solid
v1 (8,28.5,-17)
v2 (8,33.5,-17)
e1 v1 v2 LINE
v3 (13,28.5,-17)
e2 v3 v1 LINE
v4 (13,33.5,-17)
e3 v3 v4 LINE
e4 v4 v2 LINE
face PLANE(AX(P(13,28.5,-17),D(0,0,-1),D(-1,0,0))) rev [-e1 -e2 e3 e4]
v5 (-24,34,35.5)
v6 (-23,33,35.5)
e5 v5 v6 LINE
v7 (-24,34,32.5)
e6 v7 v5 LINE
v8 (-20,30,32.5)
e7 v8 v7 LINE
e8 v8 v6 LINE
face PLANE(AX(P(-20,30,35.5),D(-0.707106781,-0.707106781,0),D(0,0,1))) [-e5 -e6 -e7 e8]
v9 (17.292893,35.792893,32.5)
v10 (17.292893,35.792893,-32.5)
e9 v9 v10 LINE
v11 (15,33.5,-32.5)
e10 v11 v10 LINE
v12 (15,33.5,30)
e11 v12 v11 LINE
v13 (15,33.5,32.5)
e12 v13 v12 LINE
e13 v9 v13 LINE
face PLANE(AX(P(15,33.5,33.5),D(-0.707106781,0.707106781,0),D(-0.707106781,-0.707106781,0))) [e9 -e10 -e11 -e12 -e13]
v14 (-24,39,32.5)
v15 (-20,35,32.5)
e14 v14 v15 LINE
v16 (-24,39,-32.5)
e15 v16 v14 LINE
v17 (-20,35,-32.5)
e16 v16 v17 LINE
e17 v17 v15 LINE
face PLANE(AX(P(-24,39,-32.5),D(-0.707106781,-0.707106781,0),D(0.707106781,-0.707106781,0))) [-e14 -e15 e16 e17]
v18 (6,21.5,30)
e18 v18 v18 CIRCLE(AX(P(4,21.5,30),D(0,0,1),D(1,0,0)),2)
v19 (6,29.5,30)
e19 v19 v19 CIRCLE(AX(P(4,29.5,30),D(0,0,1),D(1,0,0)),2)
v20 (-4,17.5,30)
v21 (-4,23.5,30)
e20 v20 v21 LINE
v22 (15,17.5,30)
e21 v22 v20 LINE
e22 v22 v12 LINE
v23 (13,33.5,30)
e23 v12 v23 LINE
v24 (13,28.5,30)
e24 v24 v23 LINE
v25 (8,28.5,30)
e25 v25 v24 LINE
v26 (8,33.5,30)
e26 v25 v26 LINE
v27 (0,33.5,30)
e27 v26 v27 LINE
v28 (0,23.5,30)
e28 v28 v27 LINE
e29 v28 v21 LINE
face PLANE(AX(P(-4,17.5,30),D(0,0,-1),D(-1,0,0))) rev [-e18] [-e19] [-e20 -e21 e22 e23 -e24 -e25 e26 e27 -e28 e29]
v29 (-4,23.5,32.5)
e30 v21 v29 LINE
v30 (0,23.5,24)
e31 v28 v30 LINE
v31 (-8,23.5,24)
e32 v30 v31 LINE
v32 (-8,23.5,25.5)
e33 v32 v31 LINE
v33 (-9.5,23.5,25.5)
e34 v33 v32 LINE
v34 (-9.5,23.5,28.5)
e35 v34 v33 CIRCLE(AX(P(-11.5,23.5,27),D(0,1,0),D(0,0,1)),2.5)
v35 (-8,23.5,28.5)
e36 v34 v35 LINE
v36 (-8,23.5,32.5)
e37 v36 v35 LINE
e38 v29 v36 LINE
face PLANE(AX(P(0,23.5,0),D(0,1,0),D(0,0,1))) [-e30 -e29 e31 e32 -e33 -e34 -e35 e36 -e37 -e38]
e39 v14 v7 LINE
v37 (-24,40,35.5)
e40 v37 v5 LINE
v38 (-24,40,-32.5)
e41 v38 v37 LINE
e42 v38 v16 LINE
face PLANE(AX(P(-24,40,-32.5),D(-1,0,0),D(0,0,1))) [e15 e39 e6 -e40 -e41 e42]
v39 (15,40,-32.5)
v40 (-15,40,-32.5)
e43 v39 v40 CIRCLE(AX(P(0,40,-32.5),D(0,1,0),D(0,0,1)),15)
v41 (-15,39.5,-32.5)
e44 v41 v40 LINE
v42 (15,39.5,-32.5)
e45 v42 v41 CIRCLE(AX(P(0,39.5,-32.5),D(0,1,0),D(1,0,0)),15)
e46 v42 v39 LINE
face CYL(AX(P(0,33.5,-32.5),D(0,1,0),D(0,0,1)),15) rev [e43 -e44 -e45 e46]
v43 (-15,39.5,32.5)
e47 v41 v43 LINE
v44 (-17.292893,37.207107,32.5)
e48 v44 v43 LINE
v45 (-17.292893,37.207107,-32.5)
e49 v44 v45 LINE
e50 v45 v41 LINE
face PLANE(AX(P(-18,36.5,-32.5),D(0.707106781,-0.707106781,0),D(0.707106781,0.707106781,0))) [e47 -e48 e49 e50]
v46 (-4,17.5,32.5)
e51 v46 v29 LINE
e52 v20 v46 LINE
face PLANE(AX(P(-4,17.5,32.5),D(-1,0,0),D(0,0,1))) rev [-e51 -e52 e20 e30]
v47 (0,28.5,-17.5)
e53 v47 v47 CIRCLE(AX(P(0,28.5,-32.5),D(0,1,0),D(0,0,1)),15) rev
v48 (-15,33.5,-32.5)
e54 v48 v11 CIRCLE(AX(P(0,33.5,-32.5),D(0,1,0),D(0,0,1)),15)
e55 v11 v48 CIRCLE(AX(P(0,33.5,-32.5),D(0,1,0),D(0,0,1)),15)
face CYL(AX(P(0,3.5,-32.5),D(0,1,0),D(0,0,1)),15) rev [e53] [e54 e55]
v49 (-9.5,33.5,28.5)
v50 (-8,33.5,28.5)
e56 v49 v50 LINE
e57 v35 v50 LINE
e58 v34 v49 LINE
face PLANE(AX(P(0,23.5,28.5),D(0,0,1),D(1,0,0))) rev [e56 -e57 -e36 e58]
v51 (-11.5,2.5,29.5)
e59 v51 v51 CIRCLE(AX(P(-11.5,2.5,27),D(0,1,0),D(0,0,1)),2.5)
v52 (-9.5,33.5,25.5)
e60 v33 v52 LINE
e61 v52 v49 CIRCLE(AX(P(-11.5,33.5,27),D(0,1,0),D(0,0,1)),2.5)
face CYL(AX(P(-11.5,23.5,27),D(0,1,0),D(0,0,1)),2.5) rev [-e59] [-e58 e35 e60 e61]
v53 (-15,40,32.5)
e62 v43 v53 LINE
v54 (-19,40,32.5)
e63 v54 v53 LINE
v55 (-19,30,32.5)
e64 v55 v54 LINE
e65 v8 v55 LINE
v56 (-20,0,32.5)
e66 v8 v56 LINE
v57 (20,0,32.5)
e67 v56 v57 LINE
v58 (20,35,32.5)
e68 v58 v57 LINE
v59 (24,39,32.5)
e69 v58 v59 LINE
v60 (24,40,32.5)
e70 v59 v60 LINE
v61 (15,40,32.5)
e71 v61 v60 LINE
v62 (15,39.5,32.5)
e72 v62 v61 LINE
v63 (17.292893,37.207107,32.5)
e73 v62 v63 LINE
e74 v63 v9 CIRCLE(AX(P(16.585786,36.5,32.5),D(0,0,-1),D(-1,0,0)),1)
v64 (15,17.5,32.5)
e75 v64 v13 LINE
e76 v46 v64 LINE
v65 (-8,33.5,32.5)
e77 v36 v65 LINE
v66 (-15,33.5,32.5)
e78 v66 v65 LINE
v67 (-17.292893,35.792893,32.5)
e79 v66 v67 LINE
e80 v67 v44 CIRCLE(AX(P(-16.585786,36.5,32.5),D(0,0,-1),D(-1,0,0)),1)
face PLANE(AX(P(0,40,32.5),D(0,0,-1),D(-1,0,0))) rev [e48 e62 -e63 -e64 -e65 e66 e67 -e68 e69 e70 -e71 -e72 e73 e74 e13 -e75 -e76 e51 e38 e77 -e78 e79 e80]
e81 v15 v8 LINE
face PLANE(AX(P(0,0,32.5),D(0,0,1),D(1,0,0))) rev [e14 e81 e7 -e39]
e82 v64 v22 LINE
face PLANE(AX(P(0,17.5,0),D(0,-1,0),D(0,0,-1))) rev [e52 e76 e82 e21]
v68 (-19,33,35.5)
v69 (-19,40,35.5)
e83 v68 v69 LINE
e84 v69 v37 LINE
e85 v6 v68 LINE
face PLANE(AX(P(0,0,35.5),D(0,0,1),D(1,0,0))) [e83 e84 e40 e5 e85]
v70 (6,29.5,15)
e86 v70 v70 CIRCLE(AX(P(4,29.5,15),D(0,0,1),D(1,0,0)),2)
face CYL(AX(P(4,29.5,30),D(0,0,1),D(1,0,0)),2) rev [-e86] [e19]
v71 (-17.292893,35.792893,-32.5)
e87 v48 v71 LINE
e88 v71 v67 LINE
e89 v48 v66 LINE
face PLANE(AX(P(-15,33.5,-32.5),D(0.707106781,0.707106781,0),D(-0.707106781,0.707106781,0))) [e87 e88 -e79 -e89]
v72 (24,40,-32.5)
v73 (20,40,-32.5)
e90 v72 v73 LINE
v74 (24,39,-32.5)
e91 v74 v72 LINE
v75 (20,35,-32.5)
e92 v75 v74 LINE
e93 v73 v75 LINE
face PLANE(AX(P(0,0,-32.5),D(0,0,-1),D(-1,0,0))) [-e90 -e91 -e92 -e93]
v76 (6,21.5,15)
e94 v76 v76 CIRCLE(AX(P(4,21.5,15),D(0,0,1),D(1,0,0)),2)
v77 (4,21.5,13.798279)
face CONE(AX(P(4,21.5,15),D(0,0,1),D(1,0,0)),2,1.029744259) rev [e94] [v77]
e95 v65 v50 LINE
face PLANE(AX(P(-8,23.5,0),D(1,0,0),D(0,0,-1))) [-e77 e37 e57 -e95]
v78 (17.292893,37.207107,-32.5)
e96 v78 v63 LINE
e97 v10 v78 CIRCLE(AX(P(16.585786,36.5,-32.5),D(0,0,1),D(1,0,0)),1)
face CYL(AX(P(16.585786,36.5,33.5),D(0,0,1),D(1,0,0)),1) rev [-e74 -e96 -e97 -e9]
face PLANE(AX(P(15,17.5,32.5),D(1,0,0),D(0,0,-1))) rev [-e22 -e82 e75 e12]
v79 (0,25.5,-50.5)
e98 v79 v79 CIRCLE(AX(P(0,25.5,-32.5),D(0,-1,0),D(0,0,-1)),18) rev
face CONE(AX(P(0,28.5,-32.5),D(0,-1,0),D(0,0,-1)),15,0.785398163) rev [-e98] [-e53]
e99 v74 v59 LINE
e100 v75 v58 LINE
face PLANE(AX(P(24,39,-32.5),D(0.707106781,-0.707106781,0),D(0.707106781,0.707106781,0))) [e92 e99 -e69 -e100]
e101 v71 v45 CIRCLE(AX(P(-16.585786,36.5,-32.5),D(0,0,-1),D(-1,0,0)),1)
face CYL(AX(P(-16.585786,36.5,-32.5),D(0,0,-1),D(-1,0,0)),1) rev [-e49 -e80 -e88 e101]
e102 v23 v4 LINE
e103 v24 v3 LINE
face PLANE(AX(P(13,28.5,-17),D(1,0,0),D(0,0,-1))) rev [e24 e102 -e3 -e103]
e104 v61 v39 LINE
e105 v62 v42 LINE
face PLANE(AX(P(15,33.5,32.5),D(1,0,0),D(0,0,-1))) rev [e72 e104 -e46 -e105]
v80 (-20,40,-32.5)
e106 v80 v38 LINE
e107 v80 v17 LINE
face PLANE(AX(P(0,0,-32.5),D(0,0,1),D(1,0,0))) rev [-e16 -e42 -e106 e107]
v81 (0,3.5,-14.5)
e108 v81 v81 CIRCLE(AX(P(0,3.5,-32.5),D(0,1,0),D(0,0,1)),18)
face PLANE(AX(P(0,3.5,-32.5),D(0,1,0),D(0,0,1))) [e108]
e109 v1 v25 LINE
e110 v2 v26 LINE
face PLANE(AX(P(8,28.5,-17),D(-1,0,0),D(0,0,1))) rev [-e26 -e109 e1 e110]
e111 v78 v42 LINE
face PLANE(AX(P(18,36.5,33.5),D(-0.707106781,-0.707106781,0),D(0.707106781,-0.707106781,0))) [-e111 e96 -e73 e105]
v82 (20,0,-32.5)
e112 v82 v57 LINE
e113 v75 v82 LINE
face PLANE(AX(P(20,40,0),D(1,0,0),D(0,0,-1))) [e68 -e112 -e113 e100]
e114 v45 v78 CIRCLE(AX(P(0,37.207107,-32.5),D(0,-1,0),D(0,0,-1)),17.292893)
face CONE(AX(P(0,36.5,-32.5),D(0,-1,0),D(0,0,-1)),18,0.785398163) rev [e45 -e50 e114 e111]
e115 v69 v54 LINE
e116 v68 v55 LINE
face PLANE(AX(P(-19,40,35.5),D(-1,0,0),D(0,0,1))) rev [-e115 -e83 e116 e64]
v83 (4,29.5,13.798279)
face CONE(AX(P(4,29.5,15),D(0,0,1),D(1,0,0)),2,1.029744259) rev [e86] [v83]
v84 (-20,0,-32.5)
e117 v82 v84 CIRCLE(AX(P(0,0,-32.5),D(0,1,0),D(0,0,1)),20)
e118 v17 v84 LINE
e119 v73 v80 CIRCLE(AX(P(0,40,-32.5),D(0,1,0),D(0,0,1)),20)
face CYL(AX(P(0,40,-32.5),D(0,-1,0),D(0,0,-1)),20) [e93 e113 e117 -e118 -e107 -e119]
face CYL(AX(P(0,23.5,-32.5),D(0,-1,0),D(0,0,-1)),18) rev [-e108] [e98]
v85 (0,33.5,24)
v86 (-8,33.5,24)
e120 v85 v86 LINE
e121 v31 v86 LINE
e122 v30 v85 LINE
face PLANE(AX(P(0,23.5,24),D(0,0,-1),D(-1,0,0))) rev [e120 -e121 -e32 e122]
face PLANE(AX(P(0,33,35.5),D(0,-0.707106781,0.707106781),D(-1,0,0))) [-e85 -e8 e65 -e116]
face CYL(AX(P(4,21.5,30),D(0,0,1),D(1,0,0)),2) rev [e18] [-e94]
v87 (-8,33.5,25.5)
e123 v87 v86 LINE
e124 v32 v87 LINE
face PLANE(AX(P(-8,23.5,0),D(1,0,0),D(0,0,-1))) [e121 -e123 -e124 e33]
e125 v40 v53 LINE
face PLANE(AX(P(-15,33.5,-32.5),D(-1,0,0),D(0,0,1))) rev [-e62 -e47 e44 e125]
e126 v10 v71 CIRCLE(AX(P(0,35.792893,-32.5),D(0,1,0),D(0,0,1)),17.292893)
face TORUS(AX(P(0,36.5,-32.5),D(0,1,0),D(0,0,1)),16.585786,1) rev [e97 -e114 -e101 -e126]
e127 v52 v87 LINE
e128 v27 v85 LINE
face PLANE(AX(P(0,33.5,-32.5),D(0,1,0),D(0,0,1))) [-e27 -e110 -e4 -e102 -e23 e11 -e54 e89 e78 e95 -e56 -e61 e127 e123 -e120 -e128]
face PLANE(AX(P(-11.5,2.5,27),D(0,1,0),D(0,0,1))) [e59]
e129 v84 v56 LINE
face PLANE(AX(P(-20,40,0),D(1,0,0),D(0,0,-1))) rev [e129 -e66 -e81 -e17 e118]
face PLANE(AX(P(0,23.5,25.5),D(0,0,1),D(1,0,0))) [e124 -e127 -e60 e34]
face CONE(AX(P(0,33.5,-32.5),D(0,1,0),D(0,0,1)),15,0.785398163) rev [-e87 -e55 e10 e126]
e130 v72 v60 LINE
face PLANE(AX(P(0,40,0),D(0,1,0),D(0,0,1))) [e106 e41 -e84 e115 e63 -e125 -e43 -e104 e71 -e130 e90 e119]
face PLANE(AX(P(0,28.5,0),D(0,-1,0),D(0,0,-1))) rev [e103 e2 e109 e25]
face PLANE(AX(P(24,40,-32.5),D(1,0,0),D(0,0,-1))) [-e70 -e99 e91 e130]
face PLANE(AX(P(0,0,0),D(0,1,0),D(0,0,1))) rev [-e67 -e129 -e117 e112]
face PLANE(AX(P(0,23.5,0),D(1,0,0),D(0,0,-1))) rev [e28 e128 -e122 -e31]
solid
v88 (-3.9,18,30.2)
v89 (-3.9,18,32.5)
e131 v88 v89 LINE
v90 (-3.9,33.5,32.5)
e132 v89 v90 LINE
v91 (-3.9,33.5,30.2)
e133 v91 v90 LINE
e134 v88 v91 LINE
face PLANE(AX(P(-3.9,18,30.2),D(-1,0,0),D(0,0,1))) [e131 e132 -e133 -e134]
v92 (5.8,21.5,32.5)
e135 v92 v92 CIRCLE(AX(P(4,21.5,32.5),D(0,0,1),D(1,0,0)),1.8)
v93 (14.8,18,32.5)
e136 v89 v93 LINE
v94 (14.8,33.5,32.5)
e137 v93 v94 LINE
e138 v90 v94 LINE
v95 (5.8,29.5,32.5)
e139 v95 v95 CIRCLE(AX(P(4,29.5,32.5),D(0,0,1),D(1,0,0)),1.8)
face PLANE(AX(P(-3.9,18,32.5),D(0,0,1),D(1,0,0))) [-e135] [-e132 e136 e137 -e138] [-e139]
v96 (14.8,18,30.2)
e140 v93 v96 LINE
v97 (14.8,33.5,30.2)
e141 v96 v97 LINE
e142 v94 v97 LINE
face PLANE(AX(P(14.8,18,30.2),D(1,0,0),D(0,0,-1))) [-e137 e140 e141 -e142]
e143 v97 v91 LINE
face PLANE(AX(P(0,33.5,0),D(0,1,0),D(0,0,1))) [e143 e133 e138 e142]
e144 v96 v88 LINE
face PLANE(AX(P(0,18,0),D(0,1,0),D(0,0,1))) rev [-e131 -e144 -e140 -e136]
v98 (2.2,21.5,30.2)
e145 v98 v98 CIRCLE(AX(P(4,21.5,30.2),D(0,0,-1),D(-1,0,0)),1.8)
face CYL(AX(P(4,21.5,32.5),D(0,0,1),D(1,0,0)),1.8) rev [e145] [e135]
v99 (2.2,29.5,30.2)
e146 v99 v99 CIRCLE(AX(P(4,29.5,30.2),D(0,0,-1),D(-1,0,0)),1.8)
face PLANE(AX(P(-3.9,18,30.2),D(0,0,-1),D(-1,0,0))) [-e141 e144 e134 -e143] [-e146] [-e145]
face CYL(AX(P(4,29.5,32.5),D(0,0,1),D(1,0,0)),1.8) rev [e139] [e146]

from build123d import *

# Parameters (mm, degrees)
DODANIE_WYCI_GNI_CIE1_DEPTH         = 40
WYTNIJ_WYCI_GNI_CIE1_DEPTH          = 6.5
SZKIC6_R                            = 15
WYTNIJ_WYCI_GNI_CIE2_DEPTH          = 30
SZKIC7_R                            = 18
WYTNIJ_WYCI_GNI_CIE4_DEPTH          = 20
SFAZOWANIE1_SIZE                    = 5
SZKIC8_W                            = 5
SZKIC8_H                            = 47
WYTNIJ_WYCI_GNI_CIE5_DEPTH          = 5
ZAOKR_GLENIE2_R                     = 1
SZKIC10_W                           = 8
SZKIC10_H                           = 6
WYTNIJ_WYCI_GNI_CIE6_DEPTH          = 10
SZKIC11_R                           = 2.5
WYTNIJ_WYCI_GNI_CIE7_DEPTH          = 21
SZKIC12_W                           = 4
SZKIC12_H                           = 2.5
WYTNIJ_WYCI_GNI_CIE8_DEPTH          = 10
DODANIE_WYCI_GNI_CIE2_DEPTH         = 65
SZKIC16_W                           = 5
SZKIC16_H                           = 10
DODANIE_WYCI_GNI_CIE3_DEPTH         = 3
SFAZOWANIE4_SIZE                    = 4
SFAZOWANIE5_SIZE                    = 3
SZKIC17_W                           = 19
SZKIC17_H                           = 2.5
WYTNIJ_WYCI_GNI_CIE9_DEPTH          = 16
OTWORY_USTALAJ_CE_4_0MM5_D          = 4
OTWORY_USTALAJ_CE_4_0MM5_DEPTH      = 15
OTWORY_USTALAJ_CE_4_0MM5_TIP        = 1.201721238
SZKIC23_W                           = 18.7
SZKIC23_H                           = 2.3
DODANIE_WYCI_GNI_CIE4_DEPTH         = 15.5
OTWORY_USTALAJ_CE_4_0MM6_AT_2_COUNT = 2
OTWORY_USTALAJ_CE_4_0MM6_AT_2_PITCH = 8


# Some blends are built 0.0001 mm under size
with BuildPart() as part:
    # Szkic1 → Dodanie-wyciągnięcie1 (new body)
    with BuildSketch(Plane(origin=(0, 0, 0), x_dir=(1, 0, 0), z_dir=(0, 1, 0))):
        with BuildLine():
            ThreePointArc((20, 32.5), (0, 12.5), (-20, 32.5))
            Line((-20, 32.5), (-20, -32.5))
            Line((-20, -32.5), (20, -32.5))
            Line((20, -32.5), (20, 32.5))
        make_face()
        with BuildLine():
            ThreePointArc((20, 32.5), (0, 52.5), (-20, 32.5))
            Line((-20, 32.5), (20, 32.5))
        make_face()
        with BuildLine():
            Line((20, 32.5), (-20, 32.5))
            ThreePointArc((-20, 32.5), (0, 12.5), (20, 32.5))
        make_face()
    extrude(amount=DODANIE_WYCI_GNI_CIE1_DEPTH)

    # Szkic2 → Wytnij-wyciągnięcie1 (cut)
    with BuildSketch(Plane(origin=(0, 40, 0), x_dir=(1, 0, 0), z_dir=(0, 1, 0))):
        with BuildLine():
            Line((-15, -32.5), (15, -32.5))
            Line((15, -32.5), (15, 32.5))
            ThreePointArc((15, 32.5), (0, 47.5), (-15, 32.5))
            Line((-15, 32.5), (-15, -32.5))
        make_face()
    extrude(amount=-WYTNIJ_WYCI_GNI_CIE1_DEPTH, mode=Mode.SUBTRACT)

    # Wycięcie-wyciągnięcie po ścieżce1: sweep along a path in Szkic5
    with BuildLine(Plane(origin=(0, 40, 0), x_dir=(1, 0, 0), z_dir=(0, 1, 0))) as wyci_cie_wyci_gni_cie_po_cie_ce1_path:
        Line((15, -32.5), (15, 32.5))
        ThreePointArc((15, 32.5), (0, 47.5), (-15, 32.5))
        Line((-15, 32.5), (-15, -32.5))
    # Szkic4 → Wycięcie-wyciągnięcie po ścieżce1 (sweep, cut)
    with BuildSketch(Plane.XY.offset(32.5)):
        Polygon((15, 33.5), (18, 36.5), (15, 39.5), align=None)
    sweep(path=wyci_cie_wyci_gni_cie_po_cie_ce1_path.line, mode=Mode.SUBTRACT)

    # Szkic6 → Wytnij-wyciągnięcie2 (cut)
    with BuildSketch(Plane(origin=(0, 33.5, 0), x_dir=(1, 0, 0), z_dir=(0, 1, 0))):
        with Locations(Location((0, 32.5, 0), (0, 0, 270))):
            Circle(SZKIC6_R)
    extrude(amount=-WYTNIJ_WYCI_GNI_CIE2_DEPTH, mode=Mode.SUBTRACT)

    # Szkic7 → Wytnij-wyciągnięcie4 (cut)
    with BuildSketch(Plane(origin=(0, 3.5, 0), x_dir=(1, 0, 0), z_dir=(0, 1, 0))):
        with Locations(Location((0, 32.5, 0), (0, 0, 270))):
            Circle(SZKIC7_R)
    extrude(amount=WYTNIJ_WYCI_GNI_CIE4_DEPTH, mode=Mode.SUBTRACT)

    # Sfazowanie1
    # the kernel refuses this chamfer: 5 mm, written as the material it takes off along each edge
    with BuildSketch(Plane(origin=(0, 23.5, -32.5), x_dir=(0, 0, 1), z_dir=(-1, 0, 0))) as sfazowanie1_piece_1_section:
        Polygon((15, SFAZOWANIE1_SIZE), (15 + SFAZOWANIE1_SIZE, 0), (15, 0), align=None)
    sfazowanie1_piece_1 = revolve(axis=Axis((0, 23.5, -32.5), (0, 1, 0)), mode=Mode.PRIVATE)
    sfazowanie1_piece_1 = sfazowanie1_piece_1 & Plane(origin=(0, 26.996373783, -32.5), x_dir=(0, 0, 1), z_dir=(0, -1, 0)) * Cylinder(18, 81, mode=Mode.PRIVATE)
    add(sfazowanie1_piece_1, mode=Mode.SUBTRACT)

    # Szkic8 → Wytnij-wyciągnięcie5 (cut)
    with BuildSketch(Plane(origin=(0, 33.5, 0), x_dir=(1, 0, 0), z_dir=(0, 1, 0))):
        with Locations((10.5, -6.5)):
            Rectangle(SZKIC8_W, SZKIC8_H)
    extrude(amount=-WYTNIJ_WYCI_GNI_CIE5_DEPTH, mode=Mode.SUBTRACT)

    # Zaokrąglenie2
    zaokr_glenie2_edges = [part.edges().sort_by_distance(p)[0] for p in [
        (18, 36.5, 0),
        (0, 36.5, -50.5),
        (-18, 36.5, 0),
    ]]
    fillet(zaokr_glenie2_edges, radius=ZAOKR_GLENIE2_R)

    # Szkic10 → Wytnij-wyciągnięcie6 (cut)
    with BuildSketch(Plane(origin=(0, 33.5, 0), x_dir=(1, 0, 0), z_dir=(0, 1, 0))):
        with BuildLine():
            ThreePointArc((-9.5, -25.5), (-14, -27), (-9.5, -28.5))
            Line((-9.5, -28.5), (-9.5, -25.5))
        make_face()
        with BuildLine():
            Line((-9.5, -25.5), (-9.5, -28.5))
            ThreePointArc((-9.5, -28.5), (-9.128291755, -27.790569415), (-9, -27))
            ThreePointArc((-9, -27), (-9.128291755, -26.209430585), (-9.5, -25.5))
        make_face()
        with Locations((-4, -27)):
            Rectangle(SZKIC10_W, SZKIC10_H)
        with BuildLine():
            Line((-9.5, -28.5), (-8, -28.5))
            Line((-8, -28.5), (-8, -25.5))
            Line((-8, -25.5), (-9.5, -25.5))
            ThreePointArc((-9.5, -25.5), (-9.128291755, -26.209430585), (-9, -27))
            ThreePointArc((-9, -27), (-9.128291755, -27.790569415), (-9.5, -28.5))
        make_face()
    extrude(amount=-WYTNIJ_WYCI_GNI_CIE6_DEPTH, mode=Mode.SUBTRACT)

    # Szkic11 → Wytnij-wyciągnięcie7 (cut)
    with BuildSketch(Plane(origin=(0, 23.5, 0), x_dir=(1, 0, 0), z_dir=(0, 1, 0))):
        with Locations(Location((-11.5, -27, 0), (0, 0, 270))):
            Circle(SZKIC11_R)
    extrude(amount=-WYTNIJ_WYCI_GNI_CIE7_DEPTH, mode=Mode.SUBTRACT)

    # Szkic12 → Wytnij-wyciągnięcie8 (cut)
    with BuildSketch(Plane(origin=(0, 33.5, 0), x_dir=(1, 0, 0), z_dir=(0, 1, 0))):
        with Locations((-6, -31.25)):
            Rectangle(SZKIC12_W, SZKIC12_H)
    extrude(amount=-WYTNIJ_WYCI_GNI_CIE8_DEPTH, mode=Mode.SUBTRACT)

    # Szkic13 → Dodanie-wyciągnięcie2 (add)
    with BuildSketch(Plane.XY.offset(32.5)):
        Polygon((-20, 40), (-24, 40), (-24, 39), (-20, 35), align=None)
        Polygon((20, 35), (20, 40), (24, 40), (24, 39), align=None)
    extrude(amount=-DODANIE_WYCI_GNI_CIE2_DEPTH)

    # Szkic16 → Dodanie-wyciągnięcie3 (add)
    with BuildSketch(Plane.XY.offset(32.5)):
        with Locations((-21.5, 35)):
            Rectangle(SZKIC16_W, SZKIC16_H)
    extrude(amount=DODANIE_WYCI_GNI_CIE3_DEPTH)

    # Sfazowanie4
    sfazowanie4_edges = [part.edges().sort_by_distance(p)[0] for p in [
        (-24, 30, 34),
    ]]
    chamfer(sfazowanie4_edges, length=SFAZOWANIE4_SIZE)

    # Sfazowanie5
    sfazowanie5_edges = [part.edges().sort_by_distance(p)[0] for p in [
        (-19.5, 30, 35.5),
    ]]
    chamfer(sfazowanie5_edges, length=SFAZOWANIE5_SIZE - 0.0001)  # a hair under: the kernel refuses the full size

    # Szkic17 → Wytnij-wyciągnięcie9 (cut)
    with BuildSketch(Plane(origin=(0, 33.5, 0), x_dir=(1, 0, 0), z_dir=(0, 1, 0))):
        with Locations((5.5, -31.25)):
            Rectangle(SZKIC17_W, SZKIC17_H)
    extrude(amount=-WYTNIJ_WYCI_GNI_CIE9_DEPTH, mode=Mode.SUBTRACT)

    # Otwory ustalające Ø4.0mm5
    with Locations(Plane.XY.offset(30)):
        with Locations((4, 29.5), (4, 21.5)):
            Hole(OTWORY_USTALAJ_CE_4_0MM5_D / 2, depth=OTWORY_USTALAJ_CE_4_0MM5_DEPTH)
            with Locations((0, 0, -(OTWORY_USTALAJ_CE_4_0MM5_DEPTH + OTWORY_USTALAJ_CE_4_0MM5_TIP / 2))):  # 118° drill point
                Cone(0, OTWORY_USTALAJ_CE_4_0MM5_D / 2, OTWORY_USTALAJ_CE_4_0MM5_TIP, mode=Mode.SUBTRACT)


with BuildPart() as body_2:
    # Szkic23 → Dodanie-wyciągnięcie4 (new body)
    with BuildSketch(Plane(origin=(0, 33.5, 0), x_dir=(1, 0, 0), z_dir=(0, 1, 0))):
        with Locations((5.45, -31.35)):
            Rectangle(SZKIC23_W, SZKIC23_H)
    extrude(amount=-DODANIE_WYCI_GNI_CIE4_DEPTH)

    # Szkic25 → Otwory ustalające Ø4.0mm6 (revolve, cut)
    with BuildSketch(Plane(origin=(4, 21.5, 32.5), x_dir=(0, -1, 0), z_dir=(1, 0, 0))):
        Polygon((0, 0), (0, 16.081549114), (1.8, 15), (1.8, 0), align=None)
    otwory_ustalaj_ce_4_0mm6 = revolve(axis=Axis((4, 21.5, 38.85), (0, 0, -1)), mode=Mode.SUBTRACT)

    # Otwory ustalające Ø4.0mm6 at 2: Otwory ustalające Ø4.0mm6 ×2
    with Locations(*[(0, i * OTWORY_USTALAJ_CE_4_0MM6_AT_2_PITCH, 0) for i in range(1, OTWORY_USTALAJ_CE_4_0MM6_AT_2_COUNT)]):
        add(otwory_ustalaj_ce_4_0mm6, mode=Mode.SUBTRACT)


solid = Compound([part.part, body_2.part])
